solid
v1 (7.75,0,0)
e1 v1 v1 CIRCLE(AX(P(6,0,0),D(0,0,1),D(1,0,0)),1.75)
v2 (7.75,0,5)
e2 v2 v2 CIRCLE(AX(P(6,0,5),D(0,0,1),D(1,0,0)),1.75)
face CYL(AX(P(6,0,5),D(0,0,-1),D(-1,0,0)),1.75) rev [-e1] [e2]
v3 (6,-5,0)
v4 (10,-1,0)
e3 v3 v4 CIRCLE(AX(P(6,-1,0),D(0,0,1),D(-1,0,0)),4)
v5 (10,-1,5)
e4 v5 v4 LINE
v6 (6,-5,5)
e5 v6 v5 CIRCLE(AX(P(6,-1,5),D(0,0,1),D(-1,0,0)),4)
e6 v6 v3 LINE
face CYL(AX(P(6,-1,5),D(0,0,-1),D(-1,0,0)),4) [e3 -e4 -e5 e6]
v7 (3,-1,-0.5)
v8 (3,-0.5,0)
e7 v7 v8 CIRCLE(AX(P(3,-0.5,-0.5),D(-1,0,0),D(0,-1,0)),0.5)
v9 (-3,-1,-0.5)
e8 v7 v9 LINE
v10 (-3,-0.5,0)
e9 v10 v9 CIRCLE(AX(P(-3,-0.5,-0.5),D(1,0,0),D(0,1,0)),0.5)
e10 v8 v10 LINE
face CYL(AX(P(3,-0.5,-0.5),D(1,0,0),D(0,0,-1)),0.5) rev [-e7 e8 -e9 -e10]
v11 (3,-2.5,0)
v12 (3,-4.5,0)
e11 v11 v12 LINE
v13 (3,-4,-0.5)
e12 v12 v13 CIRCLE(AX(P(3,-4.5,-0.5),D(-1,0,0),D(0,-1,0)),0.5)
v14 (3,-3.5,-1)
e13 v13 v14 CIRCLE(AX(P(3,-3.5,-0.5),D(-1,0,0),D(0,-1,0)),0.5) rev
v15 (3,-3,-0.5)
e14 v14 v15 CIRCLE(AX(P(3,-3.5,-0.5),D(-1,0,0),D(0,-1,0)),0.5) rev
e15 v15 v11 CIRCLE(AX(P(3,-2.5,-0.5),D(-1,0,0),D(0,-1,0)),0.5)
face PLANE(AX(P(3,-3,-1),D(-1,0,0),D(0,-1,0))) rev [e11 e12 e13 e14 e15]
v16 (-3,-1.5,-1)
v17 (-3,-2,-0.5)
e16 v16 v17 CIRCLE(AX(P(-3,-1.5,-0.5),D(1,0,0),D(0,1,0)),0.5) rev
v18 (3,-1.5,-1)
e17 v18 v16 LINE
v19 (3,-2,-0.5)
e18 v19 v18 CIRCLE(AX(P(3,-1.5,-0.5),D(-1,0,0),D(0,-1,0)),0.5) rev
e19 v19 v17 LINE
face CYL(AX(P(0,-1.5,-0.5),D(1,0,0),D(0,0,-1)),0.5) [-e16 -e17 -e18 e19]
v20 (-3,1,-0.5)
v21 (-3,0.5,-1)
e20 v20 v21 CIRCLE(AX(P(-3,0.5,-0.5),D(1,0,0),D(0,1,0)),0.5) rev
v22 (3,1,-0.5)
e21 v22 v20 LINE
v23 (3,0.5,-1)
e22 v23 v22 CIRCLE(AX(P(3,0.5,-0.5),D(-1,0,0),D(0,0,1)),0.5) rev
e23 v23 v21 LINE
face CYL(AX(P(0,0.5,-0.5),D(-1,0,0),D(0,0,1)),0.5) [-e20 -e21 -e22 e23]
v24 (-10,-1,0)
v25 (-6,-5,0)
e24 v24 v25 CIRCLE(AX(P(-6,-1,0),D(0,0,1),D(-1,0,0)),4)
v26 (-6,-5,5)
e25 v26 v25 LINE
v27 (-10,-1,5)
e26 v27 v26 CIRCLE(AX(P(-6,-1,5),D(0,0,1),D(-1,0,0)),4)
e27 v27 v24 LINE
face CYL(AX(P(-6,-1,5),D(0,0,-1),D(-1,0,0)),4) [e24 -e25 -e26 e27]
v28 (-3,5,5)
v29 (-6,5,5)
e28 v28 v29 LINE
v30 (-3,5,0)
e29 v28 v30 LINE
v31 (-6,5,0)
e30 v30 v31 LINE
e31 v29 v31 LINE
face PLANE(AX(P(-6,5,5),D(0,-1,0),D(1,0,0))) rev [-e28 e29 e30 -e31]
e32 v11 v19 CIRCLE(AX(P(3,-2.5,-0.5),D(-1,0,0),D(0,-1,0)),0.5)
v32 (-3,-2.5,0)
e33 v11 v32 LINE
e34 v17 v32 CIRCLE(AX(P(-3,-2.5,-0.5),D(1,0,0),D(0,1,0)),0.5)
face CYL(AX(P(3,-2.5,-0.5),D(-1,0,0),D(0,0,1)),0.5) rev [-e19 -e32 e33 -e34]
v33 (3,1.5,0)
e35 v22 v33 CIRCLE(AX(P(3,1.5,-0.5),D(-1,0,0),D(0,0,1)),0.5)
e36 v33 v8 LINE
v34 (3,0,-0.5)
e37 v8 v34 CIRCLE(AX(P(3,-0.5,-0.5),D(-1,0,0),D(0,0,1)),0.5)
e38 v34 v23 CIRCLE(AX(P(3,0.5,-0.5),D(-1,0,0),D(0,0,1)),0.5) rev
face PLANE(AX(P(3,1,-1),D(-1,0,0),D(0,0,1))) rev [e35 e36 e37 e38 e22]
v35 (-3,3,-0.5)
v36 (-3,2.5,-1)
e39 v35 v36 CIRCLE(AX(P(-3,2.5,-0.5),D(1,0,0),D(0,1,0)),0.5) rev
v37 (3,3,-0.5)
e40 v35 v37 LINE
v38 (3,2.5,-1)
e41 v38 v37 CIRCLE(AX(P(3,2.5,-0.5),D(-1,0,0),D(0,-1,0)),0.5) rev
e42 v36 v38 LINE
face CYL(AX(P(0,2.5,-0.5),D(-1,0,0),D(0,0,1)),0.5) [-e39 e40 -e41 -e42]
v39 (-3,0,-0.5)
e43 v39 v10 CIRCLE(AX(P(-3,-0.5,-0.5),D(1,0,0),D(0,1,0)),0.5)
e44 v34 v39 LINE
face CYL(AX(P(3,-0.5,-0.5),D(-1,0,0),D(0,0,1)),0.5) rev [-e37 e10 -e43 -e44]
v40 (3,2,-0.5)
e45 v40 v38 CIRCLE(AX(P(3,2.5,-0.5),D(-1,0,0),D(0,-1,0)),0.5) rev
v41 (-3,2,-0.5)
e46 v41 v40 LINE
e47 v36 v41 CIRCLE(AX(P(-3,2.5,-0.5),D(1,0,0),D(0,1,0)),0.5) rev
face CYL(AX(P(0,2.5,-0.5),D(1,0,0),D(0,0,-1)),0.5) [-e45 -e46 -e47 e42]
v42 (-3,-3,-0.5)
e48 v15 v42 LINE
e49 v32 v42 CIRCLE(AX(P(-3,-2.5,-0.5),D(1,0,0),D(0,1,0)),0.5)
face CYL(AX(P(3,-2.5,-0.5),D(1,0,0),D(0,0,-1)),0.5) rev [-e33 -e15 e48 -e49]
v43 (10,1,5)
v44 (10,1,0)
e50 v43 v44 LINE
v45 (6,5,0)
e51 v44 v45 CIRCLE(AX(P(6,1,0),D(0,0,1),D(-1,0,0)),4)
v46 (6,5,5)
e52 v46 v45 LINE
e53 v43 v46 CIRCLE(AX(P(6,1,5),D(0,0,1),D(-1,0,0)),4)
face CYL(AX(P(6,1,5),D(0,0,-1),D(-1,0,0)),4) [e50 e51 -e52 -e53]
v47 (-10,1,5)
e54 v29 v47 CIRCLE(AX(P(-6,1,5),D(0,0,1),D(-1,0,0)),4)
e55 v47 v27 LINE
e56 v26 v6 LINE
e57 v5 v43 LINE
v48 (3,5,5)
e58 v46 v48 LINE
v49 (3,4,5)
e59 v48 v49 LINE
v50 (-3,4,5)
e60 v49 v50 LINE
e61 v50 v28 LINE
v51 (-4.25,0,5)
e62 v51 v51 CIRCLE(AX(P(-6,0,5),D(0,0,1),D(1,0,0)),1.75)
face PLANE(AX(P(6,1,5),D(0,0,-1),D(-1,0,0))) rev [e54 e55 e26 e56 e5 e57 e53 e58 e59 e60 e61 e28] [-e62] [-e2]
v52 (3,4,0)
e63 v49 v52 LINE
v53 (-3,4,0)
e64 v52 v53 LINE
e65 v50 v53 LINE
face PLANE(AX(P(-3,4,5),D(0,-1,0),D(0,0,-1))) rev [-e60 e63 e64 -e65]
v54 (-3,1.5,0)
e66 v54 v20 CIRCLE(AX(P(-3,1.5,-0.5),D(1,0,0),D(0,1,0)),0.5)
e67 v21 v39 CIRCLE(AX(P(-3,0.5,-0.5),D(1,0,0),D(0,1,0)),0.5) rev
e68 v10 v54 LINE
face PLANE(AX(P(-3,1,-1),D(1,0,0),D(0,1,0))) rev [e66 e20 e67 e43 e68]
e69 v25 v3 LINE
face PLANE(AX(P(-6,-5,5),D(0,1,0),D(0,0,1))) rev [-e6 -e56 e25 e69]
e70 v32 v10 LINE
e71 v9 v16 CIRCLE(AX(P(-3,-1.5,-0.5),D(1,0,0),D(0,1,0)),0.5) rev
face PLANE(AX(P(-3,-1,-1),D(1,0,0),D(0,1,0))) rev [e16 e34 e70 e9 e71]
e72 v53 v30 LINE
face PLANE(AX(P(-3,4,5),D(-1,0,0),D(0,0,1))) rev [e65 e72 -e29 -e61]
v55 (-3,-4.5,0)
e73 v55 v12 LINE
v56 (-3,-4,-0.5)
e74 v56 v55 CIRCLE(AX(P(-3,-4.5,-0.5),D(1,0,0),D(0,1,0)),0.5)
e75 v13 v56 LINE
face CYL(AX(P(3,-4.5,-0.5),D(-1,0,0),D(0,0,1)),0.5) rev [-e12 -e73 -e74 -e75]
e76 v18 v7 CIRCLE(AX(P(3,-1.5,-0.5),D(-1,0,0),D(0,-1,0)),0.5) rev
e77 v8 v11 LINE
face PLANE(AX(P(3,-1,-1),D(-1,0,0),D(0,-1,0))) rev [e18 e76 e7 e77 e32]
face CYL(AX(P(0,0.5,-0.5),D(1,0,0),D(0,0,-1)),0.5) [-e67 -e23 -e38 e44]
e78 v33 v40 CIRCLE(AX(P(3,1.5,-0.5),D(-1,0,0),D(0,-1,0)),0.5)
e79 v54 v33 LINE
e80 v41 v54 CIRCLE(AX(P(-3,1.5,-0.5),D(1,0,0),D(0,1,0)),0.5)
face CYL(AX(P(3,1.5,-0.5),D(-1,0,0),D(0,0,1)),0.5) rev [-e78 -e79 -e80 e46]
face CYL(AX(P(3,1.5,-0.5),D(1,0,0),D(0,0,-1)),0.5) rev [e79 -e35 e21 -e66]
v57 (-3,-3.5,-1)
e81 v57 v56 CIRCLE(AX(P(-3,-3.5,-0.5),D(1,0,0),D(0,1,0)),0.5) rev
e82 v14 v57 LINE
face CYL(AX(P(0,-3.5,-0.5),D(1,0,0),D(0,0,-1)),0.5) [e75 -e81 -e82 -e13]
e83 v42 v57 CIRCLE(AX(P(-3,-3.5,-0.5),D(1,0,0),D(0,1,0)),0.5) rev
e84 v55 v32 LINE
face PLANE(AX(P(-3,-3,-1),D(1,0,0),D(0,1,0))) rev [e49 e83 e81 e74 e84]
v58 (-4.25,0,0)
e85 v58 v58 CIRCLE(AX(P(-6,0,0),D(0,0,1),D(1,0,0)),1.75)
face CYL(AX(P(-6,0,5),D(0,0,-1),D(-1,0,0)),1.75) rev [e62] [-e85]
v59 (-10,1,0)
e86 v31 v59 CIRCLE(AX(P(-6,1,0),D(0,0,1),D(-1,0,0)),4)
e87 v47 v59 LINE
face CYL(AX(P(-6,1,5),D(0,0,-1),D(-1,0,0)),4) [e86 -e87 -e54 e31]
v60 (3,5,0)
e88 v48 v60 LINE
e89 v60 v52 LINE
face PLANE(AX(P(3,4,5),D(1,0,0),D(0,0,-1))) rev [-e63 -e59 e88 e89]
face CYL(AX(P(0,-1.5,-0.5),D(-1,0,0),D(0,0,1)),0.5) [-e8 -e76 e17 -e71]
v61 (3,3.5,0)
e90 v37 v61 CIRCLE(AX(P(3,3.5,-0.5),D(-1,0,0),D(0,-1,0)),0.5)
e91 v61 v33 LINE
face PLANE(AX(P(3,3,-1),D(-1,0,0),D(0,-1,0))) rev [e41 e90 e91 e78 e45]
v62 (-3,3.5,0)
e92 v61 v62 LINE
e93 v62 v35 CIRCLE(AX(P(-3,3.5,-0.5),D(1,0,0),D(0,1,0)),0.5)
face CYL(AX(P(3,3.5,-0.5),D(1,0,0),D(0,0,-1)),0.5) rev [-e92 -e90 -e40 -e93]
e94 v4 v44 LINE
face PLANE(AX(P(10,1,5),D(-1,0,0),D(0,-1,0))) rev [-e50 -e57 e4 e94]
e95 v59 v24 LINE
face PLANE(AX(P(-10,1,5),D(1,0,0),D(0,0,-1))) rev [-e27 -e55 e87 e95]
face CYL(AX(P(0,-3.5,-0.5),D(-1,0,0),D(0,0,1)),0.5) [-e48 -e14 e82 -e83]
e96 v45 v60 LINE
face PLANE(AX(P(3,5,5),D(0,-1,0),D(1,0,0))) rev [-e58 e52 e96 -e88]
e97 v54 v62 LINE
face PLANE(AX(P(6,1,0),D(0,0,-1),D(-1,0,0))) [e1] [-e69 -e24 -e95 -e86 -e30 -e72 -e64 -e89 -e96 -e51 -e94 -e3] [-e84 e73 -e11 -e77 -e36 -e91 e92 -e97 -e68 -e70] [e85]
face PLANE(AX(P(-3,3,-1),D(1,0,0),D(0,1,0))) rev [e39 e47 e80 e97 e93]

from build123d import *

# Parameters (mm, degrees)
SKETCH1_R           = 1.75
BOSS_EXTRUDE1_DEPTH = 5
SKETCH2_W           = 6
SKETCH2_H           = 1
BOSS_EXTRUDE2_DEPTH = 1
FILLET1_START       = -3
FILLET1_DEPTH       = 6
FILLET1_2_DEPTH     = 6


with BuildPart() as part:
    # Sketch1 → Boss-Extrude1 (new body)
    with BuildSketch(Plane.XY):
        with BuildLine():
            Line((-6, 5), (-3, 5))
            Line((-3, 5), (-3, 4))
            Line((-3, 4), (3, 4))
            Line((3, 4), (3, 5))
            Line((3, 5), (6, 5))
            ThreePointArc((6, 5), (8.828427125, 3.828427125), (10, 1))
            Line((10, 1), (10, -1))
            ThreePointArc((10, -1), (8.828427125, -3.828427125), (6, -5))
            Line((6, -5), (-6, -5))
            ThreePointArc((-6, -5), (-8.828427125, -3.828427125), (-10, -1))
            Line((-10, -1), (-10, 1))
            ThreePointArc((-10, 1), (-8.828427125, 3.828427125), (-6, 5))
        make_face()
        with Locations((6, 0)):
            Circle(SKETCH1_R, mode=Mode.SUBTRACT)
        with Locations((-6, 0)):
            Circle(SKETCH1_R, mode=Mode.SUBTRACT)
    extrude(amount=BOSS_EXTRUDE1_DEPTH)

    # Sketch2 → Boss-Extrude2 (add)
    with BuildSketch(Plane(origin=(0, 0, 0), x_dir=(-1, 0, 0), z_dir=(0, 0, -1))):
        with Locations((0, 2.5)):
            Rectangle(SKETCH2_W, SKETCH2_H)
        with Locations((0, 0.5)):
            Rectangle(SKETCH2_W, SKETCH2_H)
        with Locations((0, -1.5)):
            Rectangle(SKETCH2_W, SKETCH2_H)
        with Locations((0, -3.5)):
            Rectangle(SKETCH2_W, SKETCH2_H)
    extrude(amount=BOSS_EXTRUDE2_DEPTH)

    # Fillet1: read off the stored shape, not the designer's step
    # Fillet1 outline → Fillet1 (cut)
    with BuildSketch(Plane.YZ.offset(FILLET1_START)):
        with BuildLine():
            ThreePointArc((-3.5, -1), (-3.853553391, -0.853553391), (-4, -0.5))
            Line((-4, -0.5), (-4, -1))
            Line((-4, -1), (-3.5, -1))
        make_face()
        with BuildLine():
            ThreePointArc((-3, -0.5), (-3.146446609, -0.853553391), (-3.5, -1))
            Line((-3.5, -1), (-3, -1))
            Line((-3, -1), (-3, -0.5))
        make_face()
        with BuildLine():
            ThreePointArc((-1.5, -1), (-1.853553391, -0.853553391), (-2, -0.5))
            Line((-2, -0.5), (-2, -1))
            Line((-2, -1), (-1.5, -1))
        make_face()
        with BuildLine():
            ThreePointArc((-1, -0.5), (-1.146446609, -0.853553391), (-1.5, -1))
            Line((-1.5, -1), (-1, -1))
            Line((-1, -1), (-1, -0.5))
        make_face()
        with BuildLine():
            ThreePointArc((0.5, -1), (0.146446609, -0.853553391), (0, -0.5))
            Line((0, -0.5), (0, -1))
            Line((0, -1), (0.5, -1))
        make_face()
        with BuildLine():
            ThreePointArc((1, -0.5), (0.853553391, -0.853553391), (0.5, -1))
            Line((0.5, -1), (1, -1))
            Line((1, -1), (1, -0.5))
        make_face()
        with BuildLine():
            ThreePointArc((2.5, -1), (2.146446609, -0.853553391), (2, -0.5))
            Line((2, -0.5), (2, -1))
            Line((2, -1), (2.5, -1))
        make_face()
        with BuildLine():
            ThreePointArc((3, -0.5), (2.853553391, -0.853553391), (2.5, -1))
            Line((2.5, -1), (3, -1))
            Line((3, -1), (3, -0.5))
        make_face()
    extrude(amount=FILLET1_DEPTH, mode=Mode.SUBTRACT)

    # Fillet1 2 outline → Fillet1 2 (add)
    with BuildSketch(Plane.YZ.offset(FILLET1_START)):
        with BuildLine():
            Line((-4, 0), (-4.5, 0))
            ThreePointArc((-4.5, 0), (-4.146446609, -0.146446609), (-4, -0.5))
            Line((-4, -0.5), (-4, 0))
        make_face()
        with BuildLine():
            Line((2, 0), (1.5, 0))
            ThreePointArc((1.5, 0), (1.853553391, -0.146446609), (2, -0.5))
            Line((2, -0.5), (2, 0))
        make_face()
        with BuildLine():
            Line((0, 0), (-0.5, 0))
            ThreePointArc((-0.5, 0), (-0.146446609, -0.146446609), (0, -0.5))
            Line((0, -0.5), (0, 0))
        make_face()
        with BuildLine():
            Line((-2, 0), (-2.5, 0))
            ThreePointArc((-2.5, 0), (-2.146446609, -0.146446609), (-2, -0.5))
            Line((-2, -0.5), (-2, 0))
        make_face()
        with BuildLine():
            Line((-2.5, 0), (-3, 0))
            Line((-3, 0), (-3, -0.5))
            ThreePointArc((-3, -0.5), (-2.853553391, -0.146446609), (-2.5, 0))
        make_face()
        with BuildLine():
            Line((-0.5, 0), (-1, 0))
            Line((-1, 0), (-1, -0.5))
            ThreePointArc((-1, -0.5), (-0.853553391, -0.146446609), (-0.5, 0))
        make_face()
        with BuildLine():
            Line((1.5, 0), (1, 0))
            Line((1, 0), (1, -0.5))
            ThreePointArc((1, -0.5), (1.146446609, -0.146446609), (1.5, 0))
        make_face()
        with BuildLine():
            Line((3.5, 0), (3, 0))
            Line((3, 0), (3, -0.5))
            ThreePointArc((3, -0.5), (3.146446609, -0.146446609), (3.5, 0))
        make_face()
    extrude(amount=FILLET1_2_DEPTH)


solid = part.part
